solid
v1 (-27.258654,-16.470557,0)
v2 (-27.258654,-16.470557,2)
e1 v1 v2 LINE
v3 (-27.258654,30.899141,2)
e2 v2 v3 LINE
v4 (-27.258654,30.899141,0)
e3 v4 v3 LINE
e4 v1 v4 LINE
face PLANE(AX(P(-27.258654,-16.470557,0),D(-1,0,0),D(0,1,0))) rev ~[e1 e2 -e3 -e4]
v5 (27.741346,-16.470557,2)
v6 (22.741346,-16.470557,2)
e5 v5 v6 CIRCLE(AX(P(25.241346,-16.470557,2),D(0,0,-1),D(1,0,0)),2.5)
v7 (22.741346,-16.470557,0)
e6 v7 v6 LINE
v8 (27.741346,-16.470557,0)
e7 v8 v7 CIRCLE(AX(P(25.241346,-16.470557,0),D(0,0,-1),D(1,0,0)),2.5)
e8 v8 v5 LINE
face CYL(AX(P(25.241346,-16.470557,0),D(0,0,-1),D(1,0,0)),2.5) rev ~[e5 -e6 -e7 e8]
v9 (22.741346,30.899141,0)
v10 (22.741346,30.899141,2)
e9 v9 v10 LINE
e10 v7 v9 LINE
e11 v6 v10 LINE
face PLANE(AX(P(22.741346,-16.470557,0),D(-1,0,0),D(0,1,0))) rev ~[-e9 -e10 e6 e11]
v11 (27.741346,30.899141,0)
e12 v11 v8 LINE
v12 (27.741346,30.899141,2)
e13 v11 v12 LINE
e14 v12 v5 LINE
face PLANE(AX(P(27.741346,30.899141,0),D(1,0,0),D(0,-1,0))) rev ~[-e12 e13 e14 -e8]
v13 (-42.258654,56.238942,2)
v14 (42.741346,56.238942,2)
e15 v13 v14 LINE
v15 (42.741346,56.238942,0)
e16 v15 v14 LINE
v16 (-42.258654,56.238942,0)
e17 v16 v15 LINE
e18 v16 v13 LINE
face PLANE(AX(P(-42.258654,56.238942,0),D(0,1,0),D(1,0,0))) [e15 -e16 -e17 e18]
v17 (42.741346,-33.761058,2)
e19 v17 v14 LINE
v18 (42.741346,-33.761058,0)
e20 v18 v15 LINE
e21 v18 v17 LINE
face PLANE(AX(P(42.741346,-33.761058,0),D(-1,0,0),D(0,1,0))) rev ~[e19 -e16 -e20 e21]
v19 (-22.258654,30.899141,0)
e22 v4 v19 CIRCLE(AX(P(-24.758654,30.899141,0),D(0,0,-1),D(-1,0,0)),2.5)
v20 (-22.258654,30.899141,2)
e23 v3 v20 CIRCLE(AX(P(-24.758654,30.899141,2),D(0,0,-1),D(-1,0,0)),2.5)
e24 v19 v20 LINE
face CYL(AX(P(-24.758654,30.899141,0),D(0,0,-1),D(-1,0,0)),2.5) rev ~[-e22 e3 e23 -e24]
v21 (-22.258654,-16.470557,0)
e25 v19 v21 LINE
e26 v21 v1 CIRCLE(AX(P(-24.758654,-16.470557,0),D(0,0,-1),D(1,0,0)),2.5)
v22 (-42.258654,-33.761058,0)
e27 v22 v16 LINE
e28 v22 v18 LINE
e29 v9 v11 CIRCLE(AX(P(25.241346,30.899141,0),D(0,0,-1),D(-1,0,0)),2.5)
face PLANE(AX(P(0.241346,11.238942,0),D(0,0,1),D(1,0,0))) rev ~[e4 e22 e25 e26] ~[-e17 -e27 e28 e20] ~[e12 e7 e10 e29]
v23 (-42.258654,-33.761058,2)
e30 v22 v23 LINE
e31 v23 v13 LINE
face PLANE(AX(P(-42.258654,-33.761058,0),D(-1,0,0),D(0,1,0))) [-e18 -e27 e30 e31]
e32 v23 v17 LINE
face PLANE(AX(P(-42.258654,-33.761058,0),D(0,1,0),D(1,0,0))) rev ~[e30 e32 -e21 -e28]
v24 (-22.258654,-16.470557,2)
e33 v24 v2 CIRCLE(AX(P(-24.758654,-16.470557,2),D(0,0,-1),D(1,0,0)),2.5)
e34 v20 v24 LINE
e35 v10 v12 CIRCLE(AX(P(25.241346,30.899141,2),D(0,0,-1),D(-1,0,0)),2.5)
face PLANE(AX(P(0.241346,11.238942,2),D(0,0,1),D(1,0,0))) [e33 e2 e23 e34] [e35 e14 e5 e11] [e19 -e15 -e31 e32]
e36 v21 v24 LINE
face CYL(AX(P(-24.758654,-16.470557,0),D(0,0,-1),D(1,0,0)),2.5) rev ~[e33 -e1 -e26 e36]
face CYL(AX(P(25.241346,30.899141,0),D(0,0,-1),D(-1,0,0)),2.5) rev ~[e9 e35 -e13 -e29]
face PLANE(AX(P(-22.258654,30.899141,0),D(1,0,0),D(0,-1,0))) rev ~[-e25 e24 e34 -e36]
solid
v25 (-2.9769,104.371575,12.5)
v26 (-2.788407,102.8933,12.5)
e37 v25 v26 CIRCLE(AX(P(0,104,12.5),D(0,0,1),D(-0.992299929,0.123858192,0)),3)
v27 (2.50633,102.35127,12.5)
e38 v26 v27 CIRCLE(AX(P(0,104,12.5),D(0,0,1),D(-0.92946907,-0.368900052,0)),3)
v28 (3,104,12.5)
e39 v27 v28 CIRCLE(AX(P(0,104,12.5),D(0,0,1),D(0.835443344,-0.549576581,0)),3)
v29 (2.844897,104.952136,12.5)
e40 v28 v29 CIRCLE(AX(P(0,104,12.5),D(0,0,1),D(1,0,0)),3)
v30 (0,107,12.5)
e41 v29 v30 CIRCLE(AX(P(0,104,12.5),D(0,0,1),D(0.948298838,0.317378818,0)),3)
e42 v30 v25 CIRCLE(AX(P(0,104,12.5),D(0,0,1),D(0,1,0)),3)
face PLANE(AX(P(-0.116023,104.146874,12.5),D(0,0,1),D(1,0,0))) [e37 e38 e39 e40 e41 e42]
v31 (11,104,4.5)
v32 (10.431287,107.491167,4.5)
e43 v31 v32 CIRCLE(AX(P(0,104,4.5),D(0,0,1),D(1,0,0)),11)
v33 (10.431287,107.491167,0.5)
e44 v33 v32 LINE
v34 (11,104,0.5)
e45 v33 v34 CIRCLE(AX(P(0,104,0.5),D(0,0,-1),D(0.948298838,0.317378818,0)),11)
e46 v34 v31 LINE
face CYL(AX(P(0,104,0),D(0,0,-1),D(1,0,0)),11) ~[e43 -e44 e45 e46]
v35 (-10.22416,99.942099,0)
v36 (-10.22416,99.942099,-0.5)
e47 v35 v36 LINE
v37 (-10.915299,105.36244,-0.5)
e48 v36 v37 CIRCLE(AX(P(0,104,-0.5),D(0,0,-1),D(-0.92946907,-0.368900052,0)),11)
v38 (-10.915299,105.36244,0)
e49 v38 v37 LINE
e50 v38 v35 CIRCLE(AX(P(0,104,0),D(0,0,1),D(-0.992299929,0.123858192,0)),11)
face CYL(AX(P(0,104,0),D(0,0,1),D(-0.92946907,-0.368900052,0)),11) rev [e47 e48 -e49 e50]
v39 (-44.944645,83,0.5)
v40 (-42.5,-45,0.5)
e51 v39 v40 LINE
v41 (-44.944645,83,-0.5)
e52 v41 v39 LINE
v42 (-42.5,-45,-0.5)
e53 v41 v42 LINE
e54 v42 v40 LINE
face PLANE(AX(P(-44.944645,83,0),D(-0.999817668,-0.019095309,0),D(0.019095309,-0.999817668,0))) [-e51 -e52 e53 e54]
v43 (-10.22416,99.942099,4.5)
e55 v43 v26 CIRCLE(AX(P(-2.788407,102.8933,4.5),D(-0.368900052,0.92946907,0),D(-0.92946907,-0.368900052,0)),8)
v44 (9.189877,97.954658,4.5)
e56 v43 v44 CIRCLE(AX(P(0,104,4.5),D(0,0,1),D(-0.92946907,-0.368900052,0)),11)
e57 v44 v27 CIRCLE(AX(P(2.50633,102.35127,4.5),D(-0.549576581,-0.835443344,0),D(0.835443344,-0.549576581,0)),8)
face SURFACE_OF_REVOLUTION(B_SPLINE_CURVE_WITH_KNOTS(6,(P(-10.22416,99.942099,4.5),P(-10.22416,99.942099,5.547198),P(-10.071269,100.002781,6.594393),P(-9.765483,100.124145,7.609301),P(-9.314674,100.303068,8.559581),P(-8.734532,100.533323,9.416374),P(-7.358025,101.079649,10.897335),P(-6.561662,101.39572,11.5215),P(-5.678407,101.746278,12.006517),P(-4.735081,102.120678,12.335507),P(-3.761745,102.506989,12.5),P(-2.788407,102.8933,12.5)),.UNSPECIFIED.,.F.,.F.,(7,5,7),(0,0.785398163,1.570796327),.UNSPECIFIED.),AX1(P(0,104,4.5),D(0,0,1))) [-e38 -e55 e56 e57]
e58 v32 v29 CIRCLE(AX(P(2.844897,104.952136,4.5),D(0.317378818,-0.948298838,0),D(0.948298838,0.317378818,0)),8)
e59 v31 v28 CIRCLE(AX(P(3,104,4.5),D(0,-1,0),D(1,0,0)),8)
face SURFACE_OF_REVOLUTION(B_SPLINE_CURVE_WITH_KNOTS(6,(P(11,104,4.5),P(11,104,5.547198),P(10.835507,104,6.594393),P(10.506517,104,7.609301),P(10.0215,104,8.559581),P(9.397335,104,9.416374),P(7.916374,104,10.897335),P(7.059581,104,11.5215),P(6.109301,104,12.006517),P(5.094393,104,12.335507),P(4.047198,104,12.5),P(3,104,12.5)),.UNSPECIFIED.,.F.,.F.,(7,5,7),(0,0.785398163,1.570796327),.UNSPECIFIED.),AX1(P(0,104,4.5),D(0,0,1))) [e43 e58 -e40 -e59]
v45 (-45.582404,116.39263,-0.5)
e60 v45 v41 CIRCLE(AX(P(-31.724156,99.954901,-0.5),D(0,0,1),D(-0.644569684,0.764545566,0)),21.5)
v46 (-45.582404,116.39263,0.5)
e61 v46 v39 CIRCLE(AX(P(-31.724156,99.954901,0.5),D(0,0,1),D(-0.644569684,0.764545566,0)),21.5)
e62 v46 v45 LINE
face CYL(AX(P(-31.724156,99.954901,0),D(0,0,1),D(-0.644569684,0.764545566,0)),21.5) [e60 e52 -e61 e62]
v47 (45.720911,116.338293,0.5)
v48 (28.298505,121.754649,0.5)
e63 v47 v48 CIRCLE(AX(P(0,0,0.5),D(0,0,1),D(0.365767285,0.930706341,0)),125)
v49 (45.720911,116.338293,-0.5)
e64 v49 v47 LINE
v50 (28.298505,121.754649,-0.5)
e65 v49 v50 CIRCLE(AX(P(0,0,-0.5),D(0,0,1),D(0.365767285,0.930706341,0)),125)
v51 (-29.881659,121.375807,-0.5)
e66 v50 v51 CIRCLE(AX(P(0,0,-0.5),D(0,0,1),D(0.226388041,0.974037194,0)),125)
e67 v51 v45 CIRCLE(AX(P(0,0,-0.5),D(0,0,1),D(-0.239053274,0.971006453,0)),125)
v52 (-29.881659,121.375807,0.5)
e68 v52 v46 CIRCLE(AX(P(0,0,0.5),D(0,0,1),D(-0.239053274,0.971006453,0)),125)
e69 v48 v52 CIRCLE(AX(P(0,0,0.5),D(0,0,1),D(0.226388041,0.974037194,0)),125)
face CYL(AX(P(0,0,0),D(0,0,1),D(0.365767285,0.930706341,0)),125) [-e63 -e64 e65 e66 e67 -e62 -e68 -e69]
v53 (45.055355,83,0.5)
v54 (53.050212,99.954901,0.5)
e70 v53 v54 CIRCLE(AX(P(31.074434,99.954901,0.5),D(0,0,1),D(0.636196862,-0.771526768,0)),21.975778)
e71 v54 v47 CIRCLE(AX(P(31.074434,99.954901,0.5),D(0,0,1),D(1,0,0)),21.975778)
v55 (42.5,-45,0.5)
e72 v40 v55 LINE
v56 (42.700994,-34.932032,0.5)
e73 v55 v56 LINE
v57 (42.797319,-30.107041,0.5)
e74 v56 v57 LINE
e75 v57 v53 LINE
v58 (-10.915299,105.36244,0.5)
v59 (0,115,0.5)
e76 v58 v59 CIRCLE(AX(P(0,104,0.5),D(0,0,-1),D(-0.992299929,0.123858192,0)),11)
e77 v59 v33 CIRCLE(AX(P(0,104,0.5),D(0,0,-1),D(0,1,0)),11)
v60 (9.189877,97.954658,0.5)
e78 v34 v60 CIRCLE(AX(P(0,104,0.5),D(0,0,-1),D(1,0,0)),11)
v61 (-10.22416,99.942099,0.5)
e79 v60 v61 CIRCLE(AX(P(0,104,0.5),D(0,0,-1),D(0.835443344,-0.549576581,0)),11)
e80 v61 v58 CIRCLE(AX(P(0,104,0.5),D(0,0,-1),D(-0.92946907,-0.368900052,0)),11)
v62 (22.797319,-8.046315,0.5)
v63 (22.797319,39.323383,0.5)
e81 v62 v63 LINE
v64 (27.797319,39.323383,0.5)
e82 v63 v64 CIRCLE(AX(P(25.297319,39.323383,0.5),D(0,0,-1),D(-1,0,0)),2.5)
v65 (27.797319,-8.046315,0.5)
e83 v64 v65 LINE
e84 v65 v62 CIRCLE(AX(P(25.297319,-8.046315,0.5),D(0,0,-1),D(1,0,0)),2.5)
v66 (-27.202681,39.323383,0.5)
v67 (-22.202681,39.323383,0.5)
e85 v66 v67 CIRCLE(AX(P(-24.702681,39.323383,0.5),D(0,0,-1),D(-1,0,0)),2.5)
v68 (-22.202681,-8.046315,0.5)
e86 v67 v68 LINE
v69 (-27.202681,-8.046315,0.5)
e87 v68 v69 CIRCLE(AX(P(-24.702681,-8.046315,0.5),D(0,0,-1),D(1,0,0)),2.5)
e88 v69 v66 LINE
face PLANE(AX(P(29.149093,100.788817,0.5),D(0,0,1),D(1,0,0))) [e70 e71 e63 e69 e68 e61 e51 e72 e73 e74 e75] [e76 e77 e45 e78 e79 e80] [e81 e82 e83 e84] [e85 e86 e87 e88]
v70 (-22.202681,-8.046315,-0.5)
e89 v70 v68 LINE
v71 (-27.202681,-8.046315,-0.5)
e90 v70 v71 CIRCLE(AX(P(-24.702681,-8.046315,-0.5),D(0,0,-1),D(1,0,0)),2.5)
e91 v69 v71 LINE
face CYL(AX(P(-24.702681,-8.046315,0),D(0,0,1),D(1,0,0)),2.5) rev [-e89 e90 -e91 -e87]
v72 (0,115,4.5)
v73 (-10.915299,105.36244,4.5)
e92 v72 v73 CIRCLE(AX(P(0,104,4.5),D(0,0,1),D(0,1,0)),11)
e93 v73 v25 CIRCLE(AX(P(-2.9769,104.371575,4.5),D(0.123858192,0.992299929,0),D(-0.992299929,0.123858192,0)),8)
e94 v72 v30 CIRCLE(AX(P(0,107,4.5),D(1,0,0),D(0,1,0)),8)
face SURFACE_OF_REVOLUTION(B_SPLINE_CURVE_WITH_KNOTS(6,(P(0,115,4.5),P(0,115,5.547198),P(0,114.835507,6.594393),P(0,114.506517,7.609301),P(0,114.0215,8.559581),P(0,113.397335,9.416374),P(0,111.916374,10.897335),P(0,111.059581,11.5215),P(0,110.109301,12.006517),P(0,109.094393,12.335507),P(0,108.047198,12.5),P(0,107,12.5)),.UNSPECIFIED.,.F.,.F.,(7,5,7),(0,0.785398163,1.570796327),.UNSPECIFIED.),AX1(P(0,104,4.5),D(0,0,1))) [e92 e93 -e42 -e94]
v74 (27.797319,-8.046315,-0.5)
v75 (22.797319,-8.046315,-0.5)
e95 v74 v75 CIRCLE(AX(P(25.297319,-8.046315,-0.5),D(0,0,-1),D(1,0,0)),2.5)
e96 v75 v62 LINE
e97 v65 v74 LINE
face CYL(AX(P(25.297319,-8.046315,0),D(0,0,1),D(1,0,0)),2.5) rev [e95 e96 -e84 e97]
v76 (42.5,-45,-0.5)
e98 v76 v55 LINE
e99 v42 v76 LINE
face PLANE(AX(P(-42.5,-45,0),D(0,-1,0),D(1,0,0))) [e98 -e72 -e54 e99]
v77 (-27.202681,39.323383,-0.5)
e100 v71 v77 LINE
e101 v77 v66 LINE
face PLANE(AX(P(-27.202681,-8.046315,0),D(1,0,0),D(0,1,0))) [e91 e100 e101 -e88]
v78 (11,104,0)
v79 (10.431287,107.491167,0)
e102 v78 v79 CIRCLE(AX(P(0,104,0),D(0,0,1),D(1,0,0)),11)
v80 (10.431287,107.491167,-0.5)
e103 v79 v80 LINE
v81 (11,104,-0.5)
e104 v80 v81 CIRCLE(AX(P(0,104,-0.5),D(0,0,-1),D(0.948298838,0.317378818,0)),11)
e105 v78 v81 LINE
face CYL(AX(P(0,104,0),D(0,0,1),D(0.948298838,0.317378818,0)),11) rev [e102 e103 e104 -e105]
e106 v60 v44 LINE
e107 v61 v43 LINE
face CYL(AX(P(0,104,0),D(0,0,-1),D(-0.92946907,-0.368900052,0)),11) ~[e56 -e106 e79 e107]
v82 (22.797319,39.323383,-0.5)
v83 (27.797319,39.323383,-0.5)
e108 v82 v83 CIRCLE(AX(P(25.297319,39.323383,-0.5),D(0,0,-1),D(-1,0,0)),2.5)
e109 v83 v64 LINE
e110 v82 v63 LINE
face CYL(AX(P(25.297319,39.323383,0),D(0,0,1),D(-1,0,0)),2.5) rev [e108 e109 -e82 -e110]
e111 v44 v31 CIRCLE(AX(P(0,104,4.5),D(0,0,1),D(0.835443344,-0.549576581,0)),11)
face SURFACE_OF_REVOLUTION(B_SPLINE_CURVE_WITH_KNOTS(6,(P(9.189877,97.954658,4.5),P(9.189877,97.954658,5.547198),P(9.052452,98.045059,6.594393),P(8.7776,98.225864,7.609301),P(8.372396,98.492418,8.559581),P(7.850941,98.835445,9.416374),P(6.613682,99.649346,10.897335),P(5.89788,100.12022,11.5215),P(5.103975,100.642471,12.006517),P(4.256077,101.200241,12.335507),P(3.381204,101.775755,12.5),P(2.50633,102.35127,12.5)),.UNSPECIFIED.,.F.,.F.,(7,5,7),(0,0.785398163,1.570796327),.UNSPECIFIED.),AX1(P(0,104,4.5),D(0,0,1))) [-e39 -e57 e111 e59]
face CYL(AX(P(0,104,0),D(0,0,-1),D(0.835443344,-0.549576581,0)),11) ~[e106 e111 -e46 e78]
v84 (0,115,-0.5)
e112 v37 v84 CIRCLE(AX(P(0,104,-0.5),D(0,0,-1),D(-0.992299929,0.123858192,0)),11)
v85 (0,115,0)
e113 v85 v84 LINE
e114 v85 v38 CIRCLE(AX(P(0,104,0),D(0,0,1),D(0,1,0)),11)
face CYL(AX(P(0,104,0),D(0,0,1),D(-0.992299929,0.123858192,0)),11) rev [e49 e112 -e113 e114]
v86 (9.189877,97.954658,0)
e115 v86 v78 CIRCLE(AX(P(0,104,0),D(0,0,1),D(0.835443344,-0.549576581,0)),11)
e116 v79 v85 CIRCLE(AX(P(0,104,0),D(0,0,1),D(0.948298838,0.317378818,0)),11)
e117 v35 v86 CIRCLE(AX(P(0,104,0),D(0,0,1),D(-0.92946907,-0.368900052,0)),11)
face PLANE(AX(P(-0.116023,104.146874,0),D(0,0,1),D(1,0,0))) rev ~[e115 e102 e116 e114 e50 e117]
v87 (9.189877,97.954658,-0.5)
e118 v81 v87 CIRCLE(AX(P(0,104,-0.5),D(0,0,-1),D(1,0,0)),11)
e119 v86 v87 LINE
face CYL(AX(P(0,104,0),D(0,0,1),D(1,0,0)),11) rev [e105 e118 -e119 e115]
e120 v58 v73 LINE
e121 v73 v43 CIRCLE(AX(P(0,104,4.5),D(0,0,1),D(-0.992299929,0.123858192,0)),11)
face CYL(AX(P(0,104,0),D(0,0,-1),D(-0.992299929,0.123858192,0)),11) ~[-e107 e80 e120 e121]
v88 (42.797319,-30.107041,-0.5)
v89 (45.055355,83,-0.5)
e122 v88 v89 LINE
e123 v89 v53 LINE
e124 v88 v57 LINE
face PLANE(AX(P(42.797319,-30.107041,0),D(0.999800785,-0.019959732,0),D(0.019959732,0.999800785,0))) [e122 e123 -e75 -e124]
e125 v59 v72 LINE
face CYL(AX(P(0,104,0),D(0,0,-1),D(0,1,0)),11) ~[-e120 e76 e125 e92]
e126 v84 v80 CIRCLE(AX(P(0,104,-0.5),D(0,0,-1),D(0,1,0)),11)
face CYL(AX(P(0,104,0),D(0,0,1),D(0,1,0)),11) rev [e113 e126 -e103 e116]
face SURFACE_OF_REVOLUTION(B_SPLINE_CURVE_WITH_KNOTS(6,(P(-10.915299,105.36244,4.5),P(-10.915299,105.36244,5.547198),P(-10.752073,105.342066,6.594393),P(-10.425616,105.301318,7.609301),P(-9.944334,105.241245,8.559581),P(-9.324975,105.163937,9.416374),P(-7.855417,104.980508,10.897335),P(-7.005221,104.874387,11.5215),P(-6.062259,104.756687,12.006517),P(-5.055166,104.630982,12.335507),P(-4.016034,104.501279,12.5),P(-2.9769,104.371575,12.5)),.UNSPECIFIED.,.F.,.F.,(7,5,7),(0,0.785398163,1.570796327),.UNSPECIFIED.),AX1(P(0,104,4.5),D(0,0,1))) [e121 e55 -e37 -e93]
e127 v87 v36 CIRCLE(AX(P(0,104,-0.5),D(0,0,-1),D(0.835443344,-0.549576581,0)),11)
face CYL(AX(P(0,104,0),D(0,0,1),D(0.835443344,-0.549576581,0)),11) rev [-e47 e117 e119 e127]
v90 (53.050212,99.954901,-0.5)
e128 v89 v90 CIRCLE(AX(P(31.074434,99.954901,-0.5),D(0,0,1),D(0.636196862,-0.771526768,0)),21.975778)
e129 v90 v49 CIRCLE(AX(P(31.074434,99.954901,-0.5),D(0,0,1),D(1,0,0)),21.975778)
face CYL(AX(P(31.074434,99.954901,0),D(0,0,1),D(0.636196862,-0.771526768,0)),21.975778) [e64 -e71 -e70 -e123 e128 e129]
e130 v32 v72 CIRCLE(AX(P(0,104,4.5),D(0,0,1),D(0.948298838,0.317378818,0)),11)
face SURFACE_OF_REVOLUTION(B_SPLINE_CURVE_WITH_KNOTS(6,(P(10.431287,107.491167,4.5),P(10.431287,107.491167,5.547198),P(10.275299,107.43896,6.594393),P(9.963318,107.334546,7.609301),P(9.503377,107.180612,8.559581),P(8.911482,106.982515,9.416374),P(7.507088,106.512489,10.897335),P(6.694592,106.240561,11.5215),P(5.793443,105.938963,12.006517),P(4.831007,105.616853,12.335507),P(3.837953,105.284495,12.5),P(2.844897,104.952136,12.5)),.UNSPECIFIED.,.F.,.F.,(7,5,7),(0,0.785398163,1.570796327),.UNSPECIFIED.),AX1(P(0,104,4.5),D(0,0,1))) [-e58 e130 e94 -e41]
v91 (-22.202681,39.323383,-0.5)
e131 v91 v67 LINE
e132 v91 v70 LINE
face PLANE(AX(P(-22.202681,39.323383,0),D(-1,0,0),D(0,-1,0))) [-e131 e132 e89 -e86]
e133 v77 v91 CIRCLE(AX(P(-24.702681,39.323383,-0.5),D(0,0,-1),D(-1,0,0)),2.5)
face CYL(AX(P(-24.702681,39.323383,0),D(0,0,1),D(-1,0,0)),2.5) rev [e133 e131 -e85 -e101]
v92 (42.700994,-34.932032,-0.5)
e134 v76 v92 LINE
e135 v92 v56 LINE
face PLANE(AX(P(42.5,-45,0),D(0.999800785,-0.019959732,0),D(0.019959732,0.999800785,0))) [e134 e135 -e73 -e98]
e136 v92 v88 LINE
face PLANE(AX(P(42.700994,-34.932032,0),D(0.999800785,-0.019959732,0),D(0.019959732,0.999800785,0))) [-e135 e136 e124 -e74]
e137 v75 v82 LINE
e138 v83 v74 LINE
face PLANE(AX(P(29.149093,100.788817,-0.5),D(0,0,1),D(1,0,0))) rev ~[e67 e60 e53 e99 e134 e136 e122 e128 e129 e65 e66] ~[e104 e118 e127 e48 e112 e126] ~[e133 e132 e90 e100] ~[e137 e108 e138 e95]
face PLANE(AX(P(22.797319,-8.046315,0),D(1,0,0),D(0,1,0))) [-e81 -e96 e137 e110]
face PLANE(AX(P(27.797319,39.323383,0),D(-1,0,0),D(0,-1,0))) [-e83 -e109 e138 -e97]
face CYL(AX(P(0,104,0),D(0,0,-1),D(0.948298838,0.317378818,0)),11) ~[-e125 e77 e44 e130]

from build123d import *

# Parameters (mm, degrees)
F1_DEPTH = 12.5
F2_R     = 8
F3_W     = 85
F3_H     = 90
F4_DEPTH = 2
F5_DEPTH = 0.5


with BuildPart() as f1:
    # F0 (on Top) → F1 (new body)
    with BuildSketch(Plane.XY):
        with BuildLine():
            ThreePointArc((9.1898767867, 97.9546576073), (9.2825168111, 102.7916529277), (10.4312872179, 107.4911669936))
            ThreePointArc((10.4312872179, 107.4911669936), (6.4263972438, 112.9275650916), (0, 115))
            ThreePointArc((0, 115), (-7.2805617511, 112.2458123061), (-10.9152992151, 105.3624401069))
            ThreePointArc((-10.9152992151, 105.3624401069), (-10.3976417078, 102.6806649391), (-10.2241559556, 99.9549008188))
            ThreePointArc((-10.2241559556, 99.9549008188), (-10.2241569084, 99.9485001223), (-10.2241597667, 99.9420994264))
            ThreePointArc((-10.2241597667, 99.9420994264), (-1.1202305864, 93.0571903319), (9.1898767867, 97.9546576073))
        make_face()
        with BuildLine():
            ThreePointArc((11, 104), (10.8568908855, 105.768592746), (10.4312872179, 107.4911669936))
            ThreePointArc((10.4312872179, 107.4911669936), (9.2825168111, 102.7916529277), (9.1898767867, 97.9546576073))
            ThreePointArc((9.1898767867, 97.9546576073), (10.5377569875, 100.8447380976), (11, 104))
        make_face()
        with BuildLine():
            ThreePointArc((-10.2241559556, 99.9549008188), (-10.3976417078, 102.6806649391), (-10.9152992151, 105.3624401069))
            ThreePointArc((-10.9152992151, 105.3624401069), (-10.9116545392, 102.6086714205), (-10.2241597667, 99.9420994264))
            ThreePointArc((-10.2241597667, 99.9420994264), (-10.2241569084, 99.9485001223), (-10.2241559556, 99.9549008188))
        make_face()
    extrude(amount=F1_DEPTH)

    # F2
    f2_edges = [f1.edges().sort_by_distance(p)[0] for p in [
        (10.915299, 102.63756, 12.5),
    ]]
    fillet(f2_edges, radius=F2_R)

    # F0 (on Top) → F5 (join, symmetric)
    with BuildSketch(Plane.XY):
        with BuildLine():
            Line((45.0553547106, 83), (45.720910672, 116.3382926096))
            ThreePointArc((45.720910672, 116.3382926096), (37.1086608449, 119.3647656987), (28.2985051586, 121.7546492163))
            ThreePointArc((28.2985051586, 121.7546492163), (17.3640362052, 117.1292947522), (10.4312872179, 107.4911669936))
            ThreePointArc((10.4312872179, 107.4911669936), (10.8568908855, 105.768592746), (11, 104))
            ThreePointArc((11, 104), (10.5377569875, 100.8447380976), (9.1898767867, 97.9546576073))
            ThreePointArc((9.1898767867, 97.9546576073), (11.6452400122, 89.6864424383), (17.093512965, 83))
            Line((17.093512965, 83), (45.0553547106, 83))
        make_face()
        with BuildLine():
            ThreePointArc((53.0502116449, 99.9549008188), (51.1343756472, 108.9289492269), (45.720910672, 116.3382926096))
            Line((45.720910672, 116.3382926096), (45.0553547106, 83))
            ThreePointArc((45.0553547106, 83), (50.9512598026, 90.5822491239), (53.0502116449, 99.9549008188))
        make_face()
        with BuildLine():
            ThreePointArc((-29.8816593085, 121.3758066378), (-37.8142067265, 119.1431314413), (-45.5824041707, 116.3926304799))
            Line((-45.5824041707, 116.3926304799), (-44.9446452894, 83))
            Line((-44.9446452894, 83), (-18.5036666218, 83))
            ThreePointArc((-18.5036666218, 83), (-12.4074090251, 90.514917343), (-10.2241597667, 99.9420994264))
            ThreePointArc((-10.2241597667, 99.9420994264), (-10.9116545392, 102.6086714205), (-10.9152992151, 105.3624401069))
            ThreePointArc((-10.9152992151, 105.3624401069), (-17.8541188437, 116.3826843124), (-29.8816593085, 121.3758066378))
        make_face()
        with BuildLine():
            Line((-44.9446452894, 83), (-45.5824041707, 116.3926304799))
            ThreePointArc((-45.5824041707, 116.3926304799), (-53.2202358169, 99.5443516753), (-44.9446452894, 83))
        make_face()
        with BuildLine():
            ThreePointArc((10.4312872179, 107.4911669936), (17.3640362052, 117.1292947522), (28.2985051586, 121.7546492163))
            ThreePointArc((28.2985051586, 121.7546492163), (-0.8139254821, 124.9973500732), (-29.8816593085, 121.3758066378))
            ThreePointArc((-29.8816593085, 121.3758066378), (-17.8541188437, 116.3826843124), (-10.9152992151, 105.3624401069))
            ThreePointArc((-10.9152992151, 105.3624401069), (-7.2805617511, 112.2458123061), (0, 115))
            ThreePointArc((0, 115), (6.4263972438, 112.9275650916), (10.4312872179, 107.4911669936))
        make_face()
        with BuildLine():
            ThreePointArc((17.093512965, 83), (31.0744338378, 77.9791230117), (45.0553547106, 83))
            Line((45.0553547106, 83), (17.093512965, 83))
        make_face()
        with BuildLine():
            Line((42.797318697, -30.1070408914), (45.0553547106, 83))
            ThreePointArc((45.0553547106, 83), (31.0744338378, 77.9791230117), (17.093512965, 83))
            Line((17.093512965, 83), (-18.5036666218, 83))
            ThreePointArc((-18.5036666218, 83), (-31.7241559556, 78.4549008188), (-44.9446452894, 83))
            Line((-44.9446452894, 83), (-42.5, -45))
            Line((-42.5, -45), (42.5, -45))
            Line((42.5, -45), (42.7009939726, -34.9320323765))
            Line((42.7009939726, -34.9320323765), (-42.202681303, -34.9320323765))
            Line((-42.202681303, -34.9320323765), (-42.202681303, 55.0679676235))
            Line((-42.202681303, 55.0679676235), (42.797318697, 55.0679676235))
            Line((42.797318697, 55.0679676235), (42.797318697, -30.1070408914))
        make_face()
        with BuildLine():
            Line((-18.5036666218, 83), (-44.9446452894, 83))
            ThreePointArc((-44.9446452894, 83), (-31.7241559556, 78.4549008188), (-18.5036666218, 83))
        make_face()
        Polygon((42.7009939726, -34.9320323765), (42.797318697, -30.1070408914), (42.797318697, 55.0679676235), (-42.202681303, 55.0679676235), (-42.202681303, -34.9320323765), align=None)
        with BuildLine():
            ThreePointArc((-27.202681303, 39.3233826756), (-24.702681303, 41.8233826756), (-22.202681303, 39.3233826756))
            Line((-22.202681303, 39.3233826756), (-22.202681303, -8.0463153869))
            ThreePointArc((-22.202681303, -8.0463153869), (-24.702681303, -10.5463153869), (-27.202681303, -8.0463153869))
            Line((-27.202681303, -8.0463153869), (-27.202681303, 39.3233826756))
        make_face(mode=Mode.SUBTRACT)
        with BuildLine():
            Line((22.797318697, -8.0463153869), (22.797318697, 39.3233826756))
            ThreePointArc((22.797318697, 39.3233826756), (25.297318697, 41.8233826756), (27.797318697, 39.3233826756))
            Line((27.797318697, 39.3233826756), (27.797318697, -8.0463153869))
            ThreePointArc((27.797318697, -8.0463153869), (25.297318697, -10.5463153869), (22.797318697, -8.0463153869))
        make_face(mode=Mode.SUBTRACT)
        with BuildLine():
            Line((-18.5036666218, 83), (17.093512965, 83))
            ThreePointArc((17.093512965, 83), (11.6452400122, 89.6864424383), (9.1898767867, 97.9546576073))
            ThreePointArc((9.1898767867, 97.9546576073), (-1.1202305864, 93.0571903319), (-10.2241597667, 99.9420994264))
            ThreePointArc((-10.2241597667, 99.9420994264), (-12.4074090251, 90.514917343), (-18.5036666218, 83))
        make_face()
    extrude(amount=F5_DEPTH, both=True)


with BuildPart() as f4:
    # F3 (on face) → F4 (new body)
    with BuildSketch(Plane.XY):
        with Locations((0.2413462102, 11.2389419973)):
            Rectangle(F3_W, F3_H)
        with BuildLine():
            ThreePointArc((-27.2586537898, 30.8991409838), (-24.7586537898, 33.3991409838), (-22.2586537898, 30.8991409838))
            Line((-22.2586537898, 30.8991409838), (-22.2586537898, -16.4705570787))
            ThreePointArc((-22.2586537898, -16.4705570787), (-24.7586537898, -18.9705570787), (-27.2586537898, -16.4705570787))
            Line((-27.2586537898, -16.4705570787), (-27.2586537898, 30.8991409838))
        make_face(mode=Mode.SUBTRACT)
        with BuildLine():
            Line((22.7413462102, -16.4705570787), (22.7413462102, 30.8991409838))
            ThreePointArc((22.7413462102, 30.8991409838), (25.2413462102, 33.3991409838), (27.7413462102, 30.8991409838))
            Line((27.7413462102, 30.8991409838), (27.7413462102, -16.4705570787))
            ThreePointArc((27.7413462102, -16.4705570787), (25.2413462102, -18.9705570787), (22.7413462102, -16.4705570787))
        make_face(mode=Mode.SUBTRACT)
    extrude(amount=F4_DEPTH)


solid = Compound([f1.part, f4.part])
